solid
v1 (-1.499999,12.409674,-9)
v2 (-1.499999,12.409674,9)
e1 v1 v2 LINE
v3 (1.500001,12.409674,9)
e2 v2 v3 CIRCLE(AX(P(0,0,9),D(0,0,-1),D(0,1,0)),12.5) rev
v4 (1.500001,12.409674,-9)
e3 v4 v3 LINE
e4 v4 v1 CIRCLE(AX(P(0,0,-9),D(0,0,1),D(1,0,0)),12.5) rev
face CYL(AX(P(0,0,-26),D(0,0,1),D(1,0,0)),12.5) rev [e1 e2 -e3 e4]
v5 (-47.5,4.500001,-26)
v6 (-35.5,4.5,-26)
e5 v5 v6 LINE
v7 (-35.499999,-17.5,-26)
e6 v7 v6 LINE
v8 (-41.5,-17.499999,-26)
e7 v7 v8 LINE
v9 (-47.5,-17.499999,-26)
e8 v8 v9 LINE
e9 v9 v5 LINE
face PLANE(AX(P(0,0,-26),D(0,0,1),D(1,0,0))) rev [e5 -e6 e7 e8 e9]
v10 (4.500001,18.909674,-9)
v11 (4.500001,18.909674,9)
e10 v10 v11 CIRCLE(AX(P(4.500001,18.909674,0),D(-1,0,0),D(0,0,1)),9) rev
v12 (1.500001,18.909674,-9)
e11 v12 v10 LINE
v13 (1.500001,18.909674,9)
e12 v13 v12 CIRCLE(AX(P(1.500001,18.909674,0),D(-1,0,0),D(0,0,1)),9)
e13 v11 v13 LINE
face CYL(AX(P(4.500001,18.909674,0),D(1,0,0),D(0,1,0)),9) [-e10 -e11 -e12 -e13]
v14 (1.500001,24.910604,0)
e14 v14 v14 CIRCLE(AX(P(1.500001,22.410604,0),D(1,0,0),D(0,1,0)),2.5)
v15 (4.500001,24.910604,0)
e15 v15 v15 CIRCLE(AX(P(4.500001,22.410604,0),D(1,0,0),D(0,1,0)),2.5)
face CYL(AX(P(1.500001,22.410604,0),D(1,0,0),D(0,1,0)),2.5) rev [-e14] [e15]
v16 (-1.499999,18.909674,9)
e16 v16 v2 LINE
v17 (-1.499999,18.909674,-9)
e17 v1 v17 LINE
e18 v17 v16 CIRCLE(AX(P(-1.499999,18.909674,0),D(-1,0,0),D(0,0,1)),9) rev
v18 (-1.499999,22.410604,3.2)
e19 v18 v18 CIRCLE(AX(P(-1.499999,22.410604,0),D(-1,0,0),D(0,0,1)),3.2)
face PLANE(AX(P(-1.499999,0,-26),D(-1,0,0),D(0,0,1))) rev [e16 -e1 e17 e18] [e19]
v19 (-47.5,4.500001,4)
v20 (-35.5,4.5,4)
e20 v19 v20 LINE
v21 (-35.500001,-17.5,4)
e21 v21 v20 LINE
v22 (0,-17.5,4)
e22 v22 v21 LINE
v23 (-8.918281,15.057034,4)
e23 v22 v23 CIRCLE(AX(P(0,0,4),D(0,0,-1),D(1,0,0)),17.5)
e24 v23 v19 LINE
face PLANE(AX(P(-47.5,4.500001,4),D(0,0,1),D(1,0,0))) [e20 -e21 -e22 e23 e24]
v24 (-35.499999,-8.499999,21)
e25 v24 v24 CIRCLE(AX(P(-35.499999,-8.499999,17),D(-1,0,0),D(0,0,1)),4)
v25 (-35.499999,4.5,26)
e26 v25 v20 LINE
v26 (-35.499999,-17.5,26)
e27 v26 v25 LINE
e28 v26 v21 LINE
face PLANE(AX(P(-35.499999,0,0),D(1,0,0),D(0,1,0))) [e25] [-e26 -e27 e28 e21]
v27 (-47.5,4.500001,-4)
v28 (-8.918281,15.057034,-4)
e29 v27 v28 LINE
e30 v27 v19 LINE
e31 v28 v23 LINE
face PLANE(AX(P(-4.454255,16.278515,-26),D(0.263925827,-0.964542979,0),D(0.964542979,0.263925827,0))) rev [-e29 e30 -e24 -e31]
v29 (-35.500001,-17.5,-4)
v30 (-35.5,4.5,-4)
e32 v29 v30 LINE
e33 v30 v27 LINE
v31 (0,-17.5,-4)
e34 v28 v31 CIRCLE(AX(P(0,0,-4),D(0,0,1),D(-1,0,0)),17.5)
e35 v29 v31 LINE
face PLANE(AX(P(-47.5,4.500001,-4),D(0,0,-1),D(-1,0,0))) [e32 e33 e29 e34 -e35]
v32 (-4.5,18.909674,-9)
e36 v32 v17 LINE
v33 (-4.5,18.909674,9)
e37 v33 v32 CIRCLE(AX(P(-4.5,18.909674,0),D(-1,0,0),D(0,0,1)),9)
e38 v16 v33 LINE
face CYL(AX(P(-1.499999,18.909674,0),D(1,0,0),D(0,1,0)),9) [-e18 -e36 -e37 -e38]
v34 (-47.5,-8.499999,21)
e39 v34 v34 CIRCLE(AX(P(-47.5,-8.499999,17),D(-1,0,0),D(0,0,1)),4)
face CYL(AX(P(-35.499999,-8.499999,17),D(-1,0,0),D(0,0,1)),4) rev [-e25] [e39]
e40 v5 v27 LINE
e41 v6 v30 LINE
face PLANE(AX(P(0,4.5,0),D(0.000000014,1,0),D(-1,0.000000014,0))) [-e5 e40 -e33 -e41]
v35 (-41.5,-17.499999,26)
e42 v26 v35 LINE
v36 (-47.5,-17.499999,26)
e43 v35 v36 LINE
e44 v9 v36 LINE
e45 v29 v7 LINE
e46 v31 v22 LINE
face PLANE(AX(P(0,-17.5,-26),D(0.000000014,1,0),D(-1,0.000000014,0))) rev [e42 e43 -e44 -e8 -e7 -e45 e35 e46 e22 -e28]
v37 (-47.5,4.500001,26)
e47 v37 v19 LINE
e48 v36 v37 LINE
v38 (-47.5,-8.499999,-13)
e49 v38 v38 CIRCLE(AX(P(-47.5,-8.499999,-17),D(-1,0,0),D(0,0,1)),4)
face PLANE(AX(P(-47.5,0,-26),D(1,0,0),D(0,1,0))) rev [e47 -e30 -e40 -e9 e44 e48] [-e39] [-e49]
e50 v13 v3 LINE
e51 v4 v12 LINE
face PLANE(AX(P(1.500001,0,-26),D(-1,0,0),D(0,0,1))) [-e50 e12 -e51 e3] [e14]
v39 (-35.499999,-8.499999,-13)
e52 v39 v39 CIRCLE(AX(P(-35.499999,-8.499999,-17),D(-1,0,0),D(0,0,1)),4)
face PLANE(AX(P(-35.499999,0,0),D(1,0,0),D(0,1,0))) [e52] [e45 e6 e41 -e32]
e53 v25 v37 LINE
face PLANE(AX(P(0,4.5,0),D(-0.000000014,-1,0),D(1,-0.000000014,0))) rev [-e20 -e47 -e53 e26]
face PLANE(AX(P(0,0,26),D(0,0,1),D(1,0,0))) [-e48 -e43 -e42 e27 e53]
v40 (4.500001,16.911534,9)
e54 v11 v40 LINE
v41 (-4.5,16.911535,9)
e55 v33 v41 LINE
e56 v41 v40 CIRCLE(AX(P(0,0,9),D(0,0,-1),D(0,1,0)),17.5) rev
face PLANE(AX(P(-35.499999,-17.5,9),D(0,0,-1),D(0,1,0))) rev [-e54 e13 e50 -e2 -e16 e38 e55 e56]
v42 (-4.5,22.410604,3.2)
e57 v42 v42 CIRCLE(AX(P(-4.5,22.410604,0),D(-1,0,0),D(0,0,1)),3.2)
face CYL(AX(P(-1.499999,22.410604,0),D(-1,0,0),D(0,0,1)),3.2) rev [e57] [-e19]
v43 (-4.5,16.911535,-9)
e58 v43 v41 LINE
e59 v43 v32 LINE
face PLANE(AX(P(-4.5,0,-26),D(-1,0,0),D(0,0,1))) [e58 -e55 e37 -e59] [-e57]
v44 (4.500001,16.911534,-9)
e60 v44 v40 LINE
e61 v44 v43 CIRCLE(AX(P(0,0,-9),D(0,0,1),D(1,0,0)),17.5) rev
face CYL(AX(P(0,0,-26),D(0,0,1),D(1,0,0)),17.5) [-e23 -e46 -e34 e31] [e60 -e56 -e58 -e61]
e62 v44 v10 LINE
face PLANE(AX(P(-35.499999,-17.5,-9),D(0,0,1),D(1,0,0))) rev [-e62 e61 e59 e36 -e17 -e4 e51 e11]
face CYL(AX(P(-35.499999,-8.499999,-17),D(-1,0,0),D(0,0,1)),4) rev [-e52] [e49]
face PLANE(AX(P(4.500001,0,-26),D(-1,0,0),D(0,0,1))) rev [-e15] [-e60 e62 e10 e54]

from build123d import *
from OCP.BRepAlgoAPI import BRepAlgoAPI_Cut
from OCP.TopTools import TopTools_ListOfShape
from build123d.topology import SkipClean

# Parameters (mm, degrees)
BOSS_EXTRUDE1_DEPTH      = 26
BOSS_EXTRUDE1_DEPTH_BACK = 26
SKETCH1_W                = 6
SKETCH1_H                = 22
SKETCH2_W                = 17
SKETCH2_H                = 45.409673579
CUT_EXTRUDE1_DEPTH       = 60
SKETCH3_R                = 4
CUT_EXTRUDE2_DEPTH       = 12.000001
SKETCH4_W                = 12
SKETCH4_H                = 22
CUT_EXTRUDE4_DEPTH       = 18
CUT_EXTRUDE5_START       = -5
CUT_EXTRUDE5_DEPTH       = 5
CUT_EXTRUDE6_DEPTH       = 5
SKETCH8_R                = 2.5
CUT_EXTRUDE7_DEPTH       = 3
SKETCH9_W                = 18.588465887
SKETCH9_H                = 5
CUT_EXTRUDE8_DEPTH       = 22
FILLET2_RADIUS           = 9
FILLET2_LENGTH           = 3.00000065
FILLET3_RADIUS           = 9
FILLET3_LENGTH           = 3
CUT_EXTRUDE9_START       = -5
CUT_EXTRUDE9_DEPTH       = 5
BOSS_EXTRUDE2_START      = -5
SKETCH11_R               = 17.5
SKETCH11_R_2             = 12.5
BOSS_EXTRUDE2_DEPTH      = 5
CUT_EXTRUDE10_DEPTH      = 5
SKETCH13_R               = 17.5
SKETCH13_R_2             = 12.5
BOSS_EXTRUDE3_DEPTH      = 5
CUT_EXTRUDE11_START      = -18
SKETCH14_W               = 3
SKETCH14_H               = 6.500000134
CUT_EXTRUDE11_DEPTH      = 18
SKETCH15_R               = 3.2
CUT_EXTRUDE12_DEPTH      = 3.000001


with BuildPart() as part:
    # Sketch1 → Boss-Extrude1 (new, two sides: drawn at the far end of the back side and taken through both)
    with BuildSketch(Plane.XY.offset(-BOSS_EXTRUDE1_DEPTH_BACK)):
        with Locations((-44.500000239, -6.499999432)):
            Rectangle(SKETCH1_W, SKETCH1_H)
        with BuildLine():
            ThreePointArc((-2.39e-07, -17.5), (-16.878212154, -4.623413726), (-8.918281091, 15.057033652))
            Line((-8.918281091, 15.057033652), (-47.500000239, 4.500000568))
            Line((-47.500000239, 4.500000568), (-41.500000239, 4.500000568))
            Line((-41.500000239, 4.500000568), (-41.500000239, -17.499999432))
            Line((-41.500000239, -17.499999432), (-2.39e-07, -17.5))
        make_face()
        with BuildLine():
            Line((-4.500000094, 27.909673713), (-4.500000094, 16.9115345))
            ThreePointArc((-4.500000094, 16.9115345), (-2.39e-07, -17.5), (4.500000556, 16.911534377))
            Line((4.500000556, 16.911534377), (4.500000556, 27.909673579))
            Line((4.500000556, 27.909673579), (1.500000556, 27.909673579))
            Line((1.500000556, 27.909673579), (1.500000556, 12.409673579))
            ThreePointArc((1.500000556, 12.409673579), (-5.6e-07, -12.5), (-1.499999444, 12.409673713))
            Line((-1.499999444, 12.409673713), (-1.499999444, 27.909673713))
            Line((-1.499999444, 27.909673713), (-4.500000094, 27.909673713))
        make_face()
    extrude(amount=BOSS_EXTRUDE1_DEPTH + BOSS_EXTRUDE1_DEPTH_BACK)

    # Sketch2 → Cut-Extrude1 (cut)
    with BuildSketch(Plane(origin=(24.500000556, 0, 0), x_dir=(0, 0, -1), z_dir=(1, 0, 0))):
        with Locations((-17.5, 5.20483679)):
            Rectangle(SKETCH2_W, SKETCH2_H)
        with Locations((17.5, 5.20483679)):
            Rectangle(SKETCH2_W, SKETCH2_H)
    extrude(amount=-CUT_EXTRUDE1_DEPTH, mode=Mode.SUBTRACT)

    # Sketch3 → Cut-Extrude2 (cut)
    with BuildSketch(Plane.ZY.offset(47.500000239)):
        with Locations((-17, -8.499999432)):
            Circle(SKETCH3_R)
        with Locations((17, -8.499999432)):
            Circle(SKETCH3_R)
    extrude(amount=-CUT_EXTRUDE2_DEPTH, mode=Mode.SUBTRACT)


with BuildPart() as cut_extrude4_tool:
    # Sketch4 → Cut-Extrude4 (new body)
    with BuildSketch(Plane(origin=(3.08e-07, 22.5, 0), x_dir=(-0.9999999999999999, 1.3684242577770874e-08, 0), z_dir=(-1.3684242577770874e-08, -0.9999999999999999, 0))):
        with Locations((41.500000301, 15)):
            Rectangle(SKETCH4_W, SKETCH4_H)
        with Locations((41.500000301, -15)):
            Rectangle(SKETCH4_W, SKETCH4_H)
    extrude(amount=CUT_EXTRUDE4_DEPTH)


with BuildPart() as part_1:
    add(part.part)

    # Cut-Extrude4: cut by cut_extrude4_tool, with a tolerance
    cut_extrude4_stock = TopTools_ListOfShape()
    cut_extrude4_stock.Append(part_1.part.wrapped)
    cut_extrude4_tools = TopTools_ListOfShape()
    cut_extrude4_tools.Append(cut_extrude4_tool.part.wrapped)
    cut_extrude4_cut = BRepAlgoAPI_Cut()
    cut_extrude4_cut.SetArguments(cut_extrude4_stock)
    cut_extrude4_cut.SetTools(cut_extrude4_tools)
    cut_extrude4_cut.SetFuzzyValue(0.00001)
    cut_extrude4_cut.Build()
    add(Compound.cast(cut_extrude4_cut.Shape()).solids(), mode=Mode.REPLACE)

    # Sketch5 → Cut-Extrude5 (cut)
    with BuildSketch(Plane.XY.offset(9).offset(CUT_EXTRUDE5_START)):
        with BuildLine():
            Line((-47.500000239, 4.50000065), (-16.911534352, 4.50000065))
            ThreePointArc((-16.911534352, 4.50000065), (-13.951973972, 10.563731456), (-8.918281071, 15.057033663))
            Line((-8.918281071, 15.057033663), (-47.500000239, 4.50000065))
        make_face()
    extrude(amount=CUT_EXTRUDE5_DEPTH, mode=Mode.SUBTRACT)

    # Sketch7 → Cut-Extrude6 (cut)
    with BuildSketch(Plane(origin=(0, 0, -9), x_dir=(-1, 0, 0), z_dir=(0, 0, -1))):
        with BuildLine():
            Line((47.500000239, 4.50000065), (16.911534352, 4.50000065))
            ThreePointArc((16.911534352, 4.50000065), (13.951973972, 10.563731456), (8.918281071, 15.057033663))
            Line((8.918281071, 15.057033663), (47.500000239, 4.50000065))
        make_face()
    extrude(amount=-CUT_EXTRUDE6_DEPTH, mode=Mode.SUBTRACT)

    # Sketch8 → Cut-Extrude7 (cut)
    with BuildSketch(Plane(origin=(4.500000556, 0, 0), x_dir=(0, 0, -1), z_dir=(1, 0, 0))):
        with Locations(Location((0, 22.410603978, 0), (0, 0, 90))):
            Circle(SKETCH8_R)
    extrude(amount=-CUT_EXTRUDE7_DEPTH, mode=Mode.SUBTRACT)


with BuildPart() as cut_extrude8_tool:
    # Sketch9 → Cut-Extrude8 (new body)
    with BuildSketch(Plane(origin=(6.2e-08, 4.5, 0), x_dir=(1.0, -1.3684242685755665e-08, 0), z_dir=(1.3684242685755665e-08, 1.0, 0))):
        with Locations((-26.205767358, 6.5)):
            Rectangle(SKETCH9_W, SKETCH9_H)
        with Locations((-26.205767358, -6.5)):
            Rectangle(SKETCH9_W, SKETCH9_H)
    extrude(amount=-CUT_EXTRUDE8_DEPTH)


with BuildPart() as part_2:
    add(part_1.part)

    # Cut-Extrude8: cut by cut_extrude8_tool, with a tolerance
    cut_extrude8_stock = TopTools_ListOfShape()
    cut_extrude8_stock.Append(part_2.part.wrapped)
    cut_extrude8_tools = TopTools_ListOfShape()
    cut_extrude8_tools.Append(cut_extrude8_tool.part.wrapped)
    cut_extrude8_cut = BRepAlgoAPI_Cut()
    cut_extrude8_cut.SetArguments(cut_extrude8_stock)
    cut_extrude8_cut.SetTools(cut_extrude8_tools)
    cut_extrude8_cut.SetFuzzyValue(0.00001)
    cut_extrude8_cut.Build()
    add(Compound.cast(cut_extrude8_cut.Shape()).solids(), mode=Mode.REPLACE)

    # Fillet2: full round fillet: the end face becomes a half cylinder, R = half its width
    fillet2_face = Plane((-2.999999769, 27.909673579, 0), x_dir=(-1, 0, 0), z_dir=(0, 1, 0))  # on the end face: x along it, z out of the body
    fillet2_slab = fillet2_face.offset(-FILLET2_RADIUS / 2) * Box(FILLET2_LENGTH, 2 * FILLET2_RADIUS, FILLET2_RADIUS, mode=Mode.PRIVATE)  # the body's end, R deep
    fillet2_round = Plane((-2.999999769, 18.909673579, 0), x_dir=(0, 1, 0), z_dir=(-1, 0, 0)) * Cylinder(FILLET2_RADIUS, FILLET2_LENGTH, mode=Mode.PRIVATE)  # its axis R under the face
    add(fillet2_slab - fillet2_round, mode=Mode.SUBTRACT)

    # Fillet3: full round fillet: the end face becomes a half cylinder, R = half its width
    fillet3_face = Plane((3.000000556, 27.909673579, 0), x_dir=(-1, 0, 0), z_dir=(0, 1, 0))  # on the end face: x along it, z out of the body
    fillet3_slab = fillet3_face.offset(-FILLET3_RADIUS / 2) * Box(FILLET3_LENGTH, 2 * FILLET3_RADIUS, FILLET3_RADIUS, mode=Mode.PRIVATE)  # the body's end, R deep
    fillet3_round = Plane((3.000000556, 18.909673579, 0), x_dir=(0, 1, 0), z_dir=(-1, 0, 0)) * Cylinder(FILLET3_RADIUS, FILLET3_LENGTH, mode=Mode.PRIVATE)  # its axis R under the face
    add(fillet3_slab - fillet3_round, mode=Mode.SUBTRACT)

    # Sketch10 → Cut-Extrude9 (cut)
    with BuildSketch(Plane.XY.offset(9).offset(CUT_EXTRUDE9_START)):
        with BuildLine():
            Line((0, -17.5), (-16.911534475, -17.5))
            Line((-16.911534475, -17.5), (-16.911534475, -4.500000187))
            ThreePointArc((-16.911534475, -4.500000187), (-10.665364427, -13.874436985), (0, -17.5))
        make_face()
    extrude(amount=CUT_EXTRUDE9_DEPTH, mode=Mode.SUBTRACT)

    # Sketch11 → Boss-Extrude2 (add)
    with BuildSketch(Plane.XY.offset(9).offset(BOSS_EXTRUDE2_START)):
        Circle(SKETCH11_R)
        with Locations(Location((0, 0, 0), (0, 0, 83.107894852))):
            Circle(SKETCH11_R_2, mode=Mode.SUBTRACT)
    extrude(amount=BOSS_EXTRUDE2_DEPTH)

    # Sketch12 → Cut-Extrude10 (cut)
    with BuildSketch(Plane(origin=(0, 0, -9), x_dir=(-1, 0, 0), z_dir=(0, 0, -1))):
        with BuildLine():
            Line((0, -17.5), (16.911534475, -17.5))
            Line((16.911534475, -17.5), (16.911534475, -4.500000187))
            ThreePointArc((16.911534475, -4.500000187), (10.665364427, -13.874436985), (0, -17.5))
        make_face()
    extrude(amount=-CUT_EXTRUDE10_DEPTH, mode=Mode.SUBTRACT)

    # Sketch13 → Boss-Extrude3 (add)
    with BuildSketch(Plane(origin=(0, 0, -9), x_dir=(-1, 0, 0), z_dir=(0, 0, -1))):
        Circle(SKETCH13_R)
        with Locations(Location((0, 0, 0), (0, 0, 180))):
            Circle(SKETCH13_R_2, mode=Mode.SUBTRACT)
    extrude(amount=-BOSS_EXTRUDE3_DEPTH)

    # Sketch14 → Cut-Extrude11 (cut)
    with SkipClean():  # the faces are left unmerged after this step: merging them gives an invalid solid
        with BuildSketch(Plane.XY.offset(9).offset(CUT_EXTRUDE11_START)):
            with Locations((5.56e-07, 15.659673646)):
                Rectangle(SKETCH14_W, SKETCH14_H)
        extrude(amount=CUT_EXTRUDE11_DEPTH, mode=Mode.SUBTRACT)

    # Sketch15 → Cut-Extrude12 (cut)
    with SkipClean():  # the faces are left unmerged after this step: merging them gives an invalid solid
        with BuildSketch(Plane.ZY.offset(4.500000094)):
            with Locations((0, 22.41060404)):
                Circle(SKETCH15_R)
        extrude(amount=-CUT_EXTRUDE12_DEPTH, mode=Mode.SUBTRACT)


solid = part_2.part
